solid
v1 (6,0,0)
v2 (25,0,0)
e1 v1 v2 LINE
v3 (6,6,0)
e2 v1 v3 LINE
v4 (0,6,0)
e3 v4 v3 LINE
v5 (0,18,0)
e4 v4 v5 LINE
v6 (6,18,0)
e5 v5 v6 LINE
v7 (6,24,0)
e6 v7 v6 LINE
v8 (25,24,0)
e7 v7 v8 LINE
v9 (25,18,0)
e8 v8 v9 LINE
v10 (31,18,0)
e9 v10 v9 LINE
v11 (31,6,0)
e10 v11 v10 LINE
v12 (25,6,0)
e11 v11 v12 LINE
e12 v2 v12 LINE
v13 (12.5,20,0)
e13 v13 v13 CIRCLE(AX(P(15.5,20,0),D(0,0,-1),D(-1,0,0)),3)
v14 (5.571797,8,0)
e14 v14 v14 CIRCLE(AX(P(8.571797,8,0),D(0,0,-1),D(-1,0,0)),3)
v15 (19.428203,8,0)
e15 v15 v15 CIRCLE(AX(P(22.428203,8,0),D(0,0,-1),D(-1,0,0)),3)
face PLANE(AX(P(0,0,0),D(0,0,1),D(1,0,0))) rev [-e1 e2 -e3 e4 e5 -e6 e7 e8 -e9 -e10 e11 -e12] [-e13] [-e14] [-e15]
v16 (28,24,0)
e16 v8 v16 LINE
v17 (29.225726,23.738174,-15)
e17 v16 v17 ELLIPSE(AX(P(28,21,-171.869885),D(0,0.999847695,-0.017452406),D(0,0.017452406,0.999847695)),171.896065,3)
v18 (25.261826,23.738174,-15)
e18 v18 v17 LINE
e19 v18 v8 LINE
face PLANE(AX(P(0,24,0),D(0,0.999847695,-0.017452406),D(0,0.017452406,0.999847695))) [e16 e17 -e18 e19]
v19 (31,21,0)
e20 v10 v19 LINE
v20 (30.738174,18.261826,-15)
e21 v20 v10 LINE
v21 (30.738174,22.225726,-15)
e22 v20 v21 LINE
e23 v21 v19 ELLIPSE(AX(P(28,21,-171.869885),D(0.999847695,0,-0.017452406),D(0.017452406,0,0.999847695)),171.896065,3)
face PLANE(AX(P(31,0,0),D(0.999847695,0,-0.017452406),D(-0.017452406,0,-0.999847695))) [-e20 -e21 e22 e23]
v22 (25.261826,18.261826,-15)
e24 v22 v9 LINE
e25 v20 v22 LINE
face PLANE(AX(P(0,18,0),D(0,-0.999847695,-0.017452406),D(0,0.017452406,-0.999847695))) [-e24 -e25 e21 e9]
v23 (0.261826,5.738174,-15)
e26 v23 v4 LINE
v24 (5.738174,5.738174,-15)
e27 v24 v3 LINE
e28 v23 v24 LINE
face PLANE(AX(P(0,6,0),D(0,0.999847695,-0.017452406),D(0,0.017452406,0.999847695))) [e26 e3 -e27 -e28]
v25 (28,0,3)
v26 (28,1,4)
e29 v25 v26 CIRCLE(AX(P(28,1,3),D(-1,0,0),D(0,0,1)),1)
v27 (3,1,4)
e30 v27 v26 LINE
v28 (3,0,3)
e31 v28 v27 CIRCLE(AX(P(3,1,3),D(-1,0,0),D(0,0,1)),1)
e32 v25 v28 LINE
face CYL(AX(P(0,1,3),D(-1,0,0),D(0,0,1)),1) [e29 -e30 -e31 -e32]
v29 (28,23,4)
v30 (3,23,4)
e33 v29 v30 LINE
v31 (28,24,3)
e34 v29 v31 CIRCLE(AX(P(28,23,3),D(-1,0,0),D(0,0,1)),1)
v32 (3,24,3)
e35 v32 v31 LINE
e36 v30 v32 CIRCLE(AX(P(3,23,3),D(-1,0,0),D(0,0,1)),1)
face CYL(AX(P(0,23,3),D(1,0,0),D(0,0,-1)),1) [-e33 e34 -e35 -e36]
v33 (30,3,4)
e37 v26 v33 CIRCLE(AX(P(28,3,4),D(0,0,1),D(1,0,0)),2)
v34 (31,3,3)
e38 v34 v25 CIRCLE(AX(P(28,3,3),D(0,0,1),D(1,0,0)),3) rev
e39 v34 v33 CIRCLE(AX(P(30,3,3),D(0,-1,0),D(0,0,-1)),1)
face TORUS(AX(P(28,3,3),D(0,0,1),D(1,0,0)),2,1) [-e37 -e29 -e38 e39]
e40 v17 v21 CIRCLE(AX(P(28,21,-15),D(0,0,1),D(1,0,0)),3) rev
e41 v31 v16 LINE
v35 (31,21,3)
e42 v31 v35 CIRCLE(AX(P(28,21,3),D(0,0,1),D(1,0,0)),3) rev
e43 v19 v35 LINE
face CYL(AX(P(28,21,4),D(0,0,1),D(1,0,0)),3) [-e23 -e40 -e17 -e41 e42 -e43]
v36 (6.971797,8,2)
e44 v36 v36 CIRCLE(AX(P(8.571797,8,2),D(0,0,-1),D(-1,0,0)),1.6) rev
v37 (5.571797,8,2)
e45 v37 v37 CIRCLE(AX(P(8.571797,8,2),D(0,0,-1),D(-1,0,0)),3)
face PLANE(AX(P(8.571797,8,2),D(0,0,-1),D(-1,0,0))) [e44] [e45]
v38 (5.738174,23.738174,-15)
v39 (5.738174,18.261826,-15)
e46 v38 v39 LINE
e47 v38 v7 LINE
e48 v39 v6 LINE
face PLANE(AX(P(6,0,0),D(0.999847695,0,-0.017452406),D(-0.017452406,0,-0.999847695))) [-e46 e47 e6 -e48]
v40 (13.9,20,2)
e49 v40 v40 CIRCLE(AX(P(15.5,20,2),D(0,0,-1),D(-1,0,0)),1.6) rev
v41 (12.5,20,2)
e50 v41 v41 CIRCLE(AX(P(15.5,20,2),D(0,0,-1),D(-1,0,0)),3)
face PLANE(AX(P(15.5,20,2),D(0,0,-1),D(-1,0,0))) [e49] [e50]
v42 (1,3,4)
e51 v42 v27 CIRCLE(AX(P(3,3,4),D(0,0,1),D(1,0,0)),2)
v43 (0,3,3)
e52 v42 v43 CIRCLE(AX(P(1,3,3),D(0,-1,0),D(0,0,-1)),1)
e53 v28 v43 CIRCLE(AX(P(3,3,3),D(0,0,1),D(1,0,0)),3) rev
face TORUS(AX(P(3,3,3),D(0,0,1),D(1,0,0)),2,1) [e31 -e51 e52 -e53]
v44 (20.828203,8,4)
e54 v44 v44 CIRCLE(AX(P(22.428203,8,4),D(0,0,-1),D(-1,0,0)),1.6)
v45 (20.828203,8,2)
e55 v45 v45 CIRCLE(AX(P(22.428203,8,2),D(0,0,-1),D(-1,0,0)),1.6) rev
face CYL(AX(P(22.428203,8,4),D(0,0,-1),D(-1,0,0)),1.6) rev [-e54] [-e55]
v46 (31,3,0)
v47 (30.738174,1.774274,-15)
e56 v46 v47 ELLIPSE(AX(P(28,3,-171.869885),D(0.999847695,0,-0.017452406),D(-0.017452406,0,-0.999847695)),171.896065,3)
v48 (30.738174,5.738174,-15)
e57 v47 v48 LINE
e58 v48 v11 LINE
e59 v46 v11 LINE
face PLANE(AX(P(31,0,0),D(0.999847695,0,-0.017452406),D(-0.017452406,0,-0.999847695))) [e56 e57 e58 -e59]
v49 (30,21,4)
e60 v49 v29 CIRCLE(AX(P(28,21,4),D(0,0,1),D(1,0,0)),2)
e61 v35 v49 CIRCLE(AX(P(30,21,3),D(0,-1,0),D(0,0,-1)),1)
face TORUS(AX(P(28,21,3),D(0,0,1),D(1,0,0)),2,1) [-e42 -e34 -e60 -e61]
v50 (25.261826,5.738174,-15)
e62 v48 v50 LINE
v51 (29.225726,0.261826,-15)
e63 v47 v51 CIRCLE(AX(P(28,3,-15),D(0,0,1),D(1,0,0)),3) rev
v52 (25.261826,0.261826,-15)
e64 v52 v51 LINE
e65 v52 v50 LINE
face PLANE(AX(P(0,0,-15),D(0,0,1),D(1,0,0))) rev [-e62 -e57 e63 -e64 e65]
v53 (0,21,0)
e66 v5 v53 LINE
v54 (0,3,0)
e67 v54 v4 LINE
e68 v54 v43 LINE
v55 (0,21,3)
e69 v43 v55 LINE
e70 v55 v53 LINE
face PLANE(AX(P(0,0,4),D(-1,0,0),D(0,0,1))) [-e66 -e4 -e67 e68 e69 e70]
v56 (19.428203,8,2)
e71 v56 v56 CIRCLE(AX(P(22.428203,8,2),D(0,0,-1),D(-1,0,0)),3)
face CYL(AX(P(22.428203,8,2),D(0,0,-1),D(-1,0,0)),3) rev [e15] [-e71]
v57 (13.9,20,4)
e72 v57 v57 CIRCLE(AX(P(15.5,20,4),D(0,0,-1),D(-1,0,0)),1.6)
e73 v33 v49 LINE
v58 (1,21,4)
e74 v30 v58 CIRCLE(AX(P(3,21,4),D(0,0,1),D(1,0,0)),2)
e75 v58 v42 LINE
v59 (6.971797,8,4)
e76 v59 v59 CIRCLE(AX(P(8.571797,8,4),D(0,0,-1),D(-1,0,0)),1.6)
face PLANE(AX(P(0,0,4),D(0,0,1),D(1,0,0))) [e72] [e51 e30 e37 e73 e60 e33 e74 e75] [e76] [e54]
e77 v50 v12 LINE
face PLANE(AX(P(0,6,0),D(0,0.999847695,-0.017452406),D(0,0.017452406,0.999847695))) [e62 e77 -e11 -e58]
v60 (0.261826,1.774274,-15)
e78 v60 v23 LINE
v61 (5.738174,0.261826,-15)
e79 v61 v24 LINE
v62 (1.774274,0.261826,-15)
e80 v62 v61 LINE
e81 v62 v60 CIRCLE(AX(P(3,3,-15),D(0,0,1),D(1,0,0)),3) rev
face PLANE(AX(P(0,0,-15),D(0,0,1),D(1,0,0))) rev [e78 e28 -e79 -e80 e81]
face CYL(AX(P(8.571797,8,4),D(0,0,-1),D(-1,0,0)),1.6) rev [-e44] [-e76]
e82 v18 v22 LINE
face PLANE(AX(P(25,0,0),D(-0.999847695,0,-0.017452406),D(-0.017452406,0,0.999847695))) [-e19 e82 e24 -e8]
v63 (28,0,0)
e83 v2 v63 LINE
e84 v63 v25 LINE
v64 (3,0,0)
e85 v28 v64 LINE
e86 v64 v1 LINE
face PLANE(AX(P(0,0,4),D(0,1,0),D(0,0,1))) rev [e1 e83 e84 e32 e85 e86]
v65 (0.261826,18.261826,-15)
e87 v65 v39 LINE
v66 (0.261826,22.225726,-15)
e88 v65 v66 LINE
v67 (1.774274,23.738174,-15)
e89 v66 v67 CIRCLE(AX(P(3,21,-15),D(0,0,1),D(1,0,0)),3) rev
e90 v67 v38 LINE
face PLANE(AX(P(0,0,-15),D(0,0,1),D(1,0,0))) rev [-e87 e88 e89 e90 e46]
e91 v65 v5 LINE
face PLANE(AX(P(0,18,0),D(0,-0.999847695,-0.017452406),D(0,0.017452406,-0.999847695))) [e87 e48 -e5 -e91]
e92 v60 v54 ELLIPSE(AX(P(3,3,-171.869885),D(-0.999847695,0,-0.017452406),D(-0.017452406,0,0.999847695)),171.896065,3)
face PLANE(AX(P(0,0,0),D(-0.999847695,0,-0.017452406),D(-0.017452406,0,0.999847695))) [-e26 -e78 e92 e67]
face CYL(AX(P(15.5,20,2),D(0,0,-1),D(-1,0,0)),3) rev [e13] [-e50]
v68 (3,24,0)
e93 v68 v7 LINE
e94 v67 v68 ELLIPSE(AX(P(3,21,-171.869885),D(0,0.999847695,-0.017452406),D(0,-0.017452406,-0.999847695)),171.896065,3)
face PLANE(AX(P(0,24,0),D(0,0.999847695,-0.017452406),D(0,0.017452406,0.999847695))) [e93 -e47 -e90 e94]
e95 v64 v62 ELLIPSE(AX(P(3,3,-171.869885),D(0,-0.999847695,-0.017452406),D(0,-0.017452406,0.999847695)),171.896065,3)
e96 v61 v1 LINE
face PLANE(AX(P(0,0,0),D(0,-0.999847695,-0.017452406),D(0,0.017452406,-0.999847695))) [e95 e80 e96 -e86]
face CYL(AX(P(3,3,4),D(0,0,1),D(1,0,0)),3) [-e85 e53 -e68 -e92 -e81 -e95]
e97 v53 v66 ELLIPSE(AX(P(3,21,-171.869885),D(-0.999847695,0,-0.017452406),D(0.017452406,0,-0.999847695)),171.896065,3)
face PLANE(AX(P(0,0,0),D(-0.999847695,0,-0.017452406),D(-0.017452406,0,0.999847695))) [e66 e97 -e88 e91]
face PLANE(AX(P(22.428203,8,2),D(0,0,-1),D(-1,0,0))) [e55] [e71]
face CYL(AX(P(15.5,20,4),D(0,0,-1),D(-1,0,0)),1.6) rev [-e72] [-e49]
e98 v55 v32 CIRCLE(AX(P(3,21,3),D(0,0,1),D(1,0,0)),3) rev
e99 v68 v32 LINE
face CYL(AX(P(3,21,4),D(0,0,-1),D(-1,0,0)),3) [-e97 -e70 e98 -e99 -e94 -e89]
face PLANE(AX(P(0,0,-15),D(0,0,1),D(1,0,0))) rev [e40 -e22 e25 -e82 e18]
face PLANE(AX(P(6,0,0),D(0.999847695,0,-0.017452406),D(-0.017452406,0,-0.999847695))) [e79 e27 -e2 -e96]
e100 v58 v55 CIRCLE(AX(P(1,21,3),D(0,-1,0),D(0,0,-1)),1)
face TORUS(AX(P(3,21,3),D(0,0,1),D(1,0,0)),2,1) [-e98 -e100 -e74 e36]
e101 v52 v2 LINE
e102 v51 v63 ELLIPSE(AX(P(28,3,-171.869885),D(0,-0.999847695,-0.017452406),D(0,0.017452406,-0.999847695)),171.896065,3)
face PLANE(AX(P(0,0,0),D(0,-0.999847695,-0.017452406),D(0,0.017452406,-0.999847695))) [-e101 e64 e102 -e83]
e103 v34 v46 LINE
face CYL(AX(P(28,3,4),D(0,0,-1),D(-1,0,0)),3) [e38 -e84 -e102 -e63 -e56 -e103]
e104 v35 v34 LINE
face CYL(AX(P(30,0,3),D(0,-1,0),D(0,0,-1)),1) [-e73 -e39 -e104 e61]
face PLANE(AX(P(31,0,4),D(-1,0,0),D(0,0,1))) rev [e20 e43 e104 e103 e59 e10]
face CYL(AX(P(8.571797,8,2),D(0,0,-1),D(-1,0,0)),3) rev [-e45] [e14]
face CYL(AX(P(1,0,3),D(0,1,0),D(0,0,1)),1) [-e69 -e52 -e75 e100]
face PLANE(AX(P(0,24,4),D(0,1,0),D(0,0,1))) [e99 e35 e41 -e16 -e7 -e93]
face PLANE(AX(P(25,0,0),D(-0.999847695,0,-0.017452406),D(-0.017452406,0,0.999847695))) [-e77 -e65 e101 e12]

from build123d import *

# Parameters (mm, degrees)
SKETCH1_W                     = 6
SKETCH1_H                     = 6
BOSS_EXTRUDE1_DEPTH           = 4
SKETCH1_3_W                   = 6
SKETCH1_3_H                   = 6
BOSS_EXTRUDE2_DEPTH           = 15
BOSS_EXTRUDE2_DRAFT           = -1
BOSS_EXTRUDE2_PROFILE_2_DEPTH = 15
BOSS_EXTRUDE2_PROFILE_2_DRAFT = -1
BOSS_EXTRUDE2_PROFILE_3_DEPTH = 15
BOSS_EXTRUDE2_PROFILE_3_DRAFT = -1
BOSS_EXTRUDE2_PROFILE_4_DEPTH = 15
BOSS_EXTRUDE2_PROFILE_4_DRAFT = -1
SKETCH2_R                     = 1.6
CUT_EXTRUDE1_DEPTH            = 42.976183724
SKETCH3_R                     = 3
CUT_EXTRUDE2_DEPTH            = 2
FILLET1_R                     = 3
FILLET2_R                     = 1


with BuildPart() as part:
    # Sketch1 → Boss-Extrude1 (new body)
    with BuildSketch(Plane.XY):
        Polygon((6, 6), (6, 0), (25, 0), (25, 6), (31, 6), (31, 18), (25, 18), (25, 24), (6, 24), (6, 18), (0, 18), (0, 6), align=None)
        with Locations((3, 21)):
            Rectangle(SKETCH1_W, SKETCH1_H)
        with Locations((3, 3)):
            Rectangle(SKETCH1_W, SKETCH1_H)
        with Locations((28, 21)):
            Rectangle(SKETCH1_W, SKETCH1_H)
        with Locations((28, 3)):
            Rectangle(SKETCH1_W, SKETCH1_H)
    extrude(amount=BOSS_EXTRUDE1_DEPTH)


with BuildPart() as boss_extrude2_tool:
    # Sketch1<3> → Boss-Extrude2 (with draft: the straight prism first)
    with BuildSketch(Plane.XY):
        with Locations((3, 21)):
            Rectangle(SKETCH1_3_W, SKETCH1_3_H)
    extrude(amount=-BOSS_EXTRUDE2_DEPTH)
    # Boss-Extrude2: the draft: its side faces are tilted about the plane it starts from
    boss_extrude2_sides = [boss_extrude2_tool.faces().sort_by_distance(p)[0] for p in [
        (3, 24, -7.5),
        (0, 21, -7.5),
        (3, 18, -7.5),
        (6, 21, -7.5),
    ]]
    draft(boss_extrude2_sides, Plane.XY, BOSS_EXTRUDE2_DRAFT)


with BuildPart() as part_1:
    add(part.part)

    # Boss-Extrude2: add boss_extrude2_tool
    add(boss_extrude2_tool.part)


with BuildPart() as boss_extrude2_profile_2_tool:
    # Sketch1<3> → Boss-Extrude2 profile 2 (with draft: the straight prism first)
    with BuildSketch(Plane.XY):
        with Locations((28, 21)):
            Rectangle(SKETCH1_3_W, SKETCH1_3_H)
    extrude(amount=-BOSS_EXTRUDE2_PROFILE_2_DEPTH)
    # Boss-Extrude2 profile 2: the draft: its side faces are tilted about the plane it starts from
    boss_extrude2_profile_2_sides = [boss_extrude2_profile_2_tool.faces().sort_by_distance(p)[0] for p in [
        (28, 18, -7.5),
        (31, 21, -7.5),
        (28, 24, -7.5),
        (25, 21, -7.5),
    ]]
    draft(boss_extrude2_profile_2_sides, Plane.XY, BOSS_EXTRUDE2_PROFILE_2_DRAFT)


with BuildPart() as part_2:
    add(part_1.part)

    # Boss-Extrude2 profile 2: add boss_extrude2_profile_2_tool
    add(boss_extrude2_profile_2_tool.part)


with BuildPart() as boss_extrude2_profile_3_tool:
    # Sketch1<3> → Boss-Extrude2 profile 3 (with draft: the straight prism first)
    with BuildSketch(Plane.XY):
        with Locations((28, 3)):
            Rectangle(SKETCH1_3_W, SKETCH1_3_H)
    extrude(amount=-BOSS_EXTRUDE2_PROFILE_3_DEPTH)
    # Boss-Extrude2 profile 3: the draft: its side faces are tilted about the plane it starts from
    boss_extrude2_profile_3_sides = [boss_extrude2_profile_3_tool.faces().sort_by_distance(p)[0] for p in [
        (28, 0, -7.5),
        (31, 3, -7.5),
        (28, 6, -7.5),
        (25, 3, -7.5),
    ]]
    draft(boss_extrude2_profile_3_sides, Plane.XY, BOSS_EXTRUDE2_PROFILE_3_DRAFT)


with BuildPart() as part_3:
    add(part_2.part)

    # Boss-Extrude2 profile 3: add boss_extrude2_profile_3_tool
    add(boss_extrude2_profile_3_tool.part)


with BuildPart() as boss_extrude2_profile_4_tool:
    # Sketch1<3> → Boss-Extrude2 profile 4 (with draft: the straight prism first)
    with BuildSketch(Plane.XY):
        with Locations((3, 3)):
            Rectangle(SKETCH1_3_W, SKETCH1_3_H)
    extrude(amount=-BOSS_EXTRUDE2_PROFILE_4_DEPTH)
    # Boss-Extrude2 profile 4: the draft: its side faces are tilted about the plane it starts from
    boss_extrude2_profile_4_sides = [boss_extrude2_profile_4_tool.faces().sort_by_distance(p)[0] for p in [
        (0, 3, -7.5),
        (3, 0, -7.5),
        (6, 3, -7.5),
        (3, 6, -7.5),
    ]]
    draft(boss_extrude2_profile_4_sides, Plane.XY, BOSS_EXTRUDE2_PROFILE_4_DRAFT)


with BuildPart() as part_4:
    add(part_3.part)

    # Boss-Extrude2 profile 4: add boss_extrude2_profile_4_tool
    add(boss_extrude2_profile_4_tool.part)

    # Sketch2 → Cut-Extrude1 (cut, through all)
    with BuildSketch(Plane(origin=(0, 0, 0), x_dir=(-1, 0, 0), z_dir=(0, 0, -1))):
        with Locations((-22.42820323, 8)):
            Circle(SKETCH2_R)
        with Locations((-15.5, 20)):
            Circle(SKETCH2_R)
        with Locations((-8.57179677, 8)):
            Circle(SKETCH2_R)
    extrude(amount=-CUT_EXTRUDE1_DEPTH, mode=Mode.SUBTRACT)

    # Sketch3 → Cut-Extrude2 (cut)
    with BuildSketch(Plane(origin=(0, 0, 0), x_dir=(-1, 0, 0), z_dir=(0, 0, -1))):
        with Locations((-15.5, 20)):
            Circle(SKETCH3_R)
        with Locations((-8.57179677, 8)):
            Circle(SKETCH3_R)
        with Locations((-22.42820323, 8)):
            Circle(SKETCH3_R)
    extrude(amount=-CUT_EXTRUDE2_DEPTH, mode=Mode.SUBTRACT)

    # Fillet1
    # the kernel refuses this fillet: 3 mm, written as the material it takes off along each edge
    with BuildSketch(Plane(origin=(31, 24, -18), x_dir=(-1, 0, 0), z_dir=(0, 0, 1)), Plane(origin=(31, 0, -18), x_dir=(0, 1, 0), z_dir=(0, 0, 1))) as fillet1_piece_1:
        with BuildLine():
            CenterArc((FILLET1_R, FILLET1_R), FILLET1_R, 180, 90)
            Line((0, FILLET1_R), (-FILLET1_R * 0.02, FILLET1_R))
            Line((-FILLET1_R * 0.02, FILLET1_R), (-FILLET1_R * 0.02, -FILLET1_R * 0.02))
            Line((-FILLET1_R * 0.02, -FILLET1_R * 0.02), (FILLET1_R, -FILLET1_R * 0.02))
            Line((FILLET1_R, -FILLET1_R * 0.02), (FILLET1_R, 0))
        make_face()
    extrude(amount=40, mode=Mode.SUBTRACT)
    with BuildSketch(Plane(origin=(0, 0, -18), x_dir=(0, 1, 0), z_dir=(0, 0, 1)), Plane(origin=(0, 24, -18), x_dir=(1, 0, 0), z_dir=(0, 0, 1))) as fillet1_piece_2:
        with BuildLine():
            CenterArc((FILLET1_R, -FILLET1_R), FILLET1_R, 90, 90)
            Line((0, -FILLET1_R), (-FILLET1_R * 0.02, -FILLET1_R))
            Line((-FILLET1_R * 0.02, -FILLET1_R), (-FILLET1_R * 0.02, FILLET1_R * 0.02))
            Line((-FILLET1_R * 0.02, FILLET1_R * 0.02), (FILLET1_R, FILLET1_R * 0.02))
            Line((FILLET1_R, FILLET1_R * 0.02), (FILLET1_R, 0))
        make_face()
    extrude(amount=40, mode=Mode.SUBTRACT)

    # Fillet2
    fillet2_edges = [part_4.edges().sort_by_distance(p)[0] for p in [
        (15.5, 24, 4),
        (31, 12, 4),
        (0, 12, 4),
        (15.5, 0, 4),
        (0.878679656, 23.121320344, 4),
        (0.878679656, 0.878679656, 4),
        (30.121320344, 0.878679656, 4),
        (30.121320344, 23.121320344, 4),
    ]]
    fillet(fillet2_edges, radius=FILLET2_R)


solid = part_4.part
